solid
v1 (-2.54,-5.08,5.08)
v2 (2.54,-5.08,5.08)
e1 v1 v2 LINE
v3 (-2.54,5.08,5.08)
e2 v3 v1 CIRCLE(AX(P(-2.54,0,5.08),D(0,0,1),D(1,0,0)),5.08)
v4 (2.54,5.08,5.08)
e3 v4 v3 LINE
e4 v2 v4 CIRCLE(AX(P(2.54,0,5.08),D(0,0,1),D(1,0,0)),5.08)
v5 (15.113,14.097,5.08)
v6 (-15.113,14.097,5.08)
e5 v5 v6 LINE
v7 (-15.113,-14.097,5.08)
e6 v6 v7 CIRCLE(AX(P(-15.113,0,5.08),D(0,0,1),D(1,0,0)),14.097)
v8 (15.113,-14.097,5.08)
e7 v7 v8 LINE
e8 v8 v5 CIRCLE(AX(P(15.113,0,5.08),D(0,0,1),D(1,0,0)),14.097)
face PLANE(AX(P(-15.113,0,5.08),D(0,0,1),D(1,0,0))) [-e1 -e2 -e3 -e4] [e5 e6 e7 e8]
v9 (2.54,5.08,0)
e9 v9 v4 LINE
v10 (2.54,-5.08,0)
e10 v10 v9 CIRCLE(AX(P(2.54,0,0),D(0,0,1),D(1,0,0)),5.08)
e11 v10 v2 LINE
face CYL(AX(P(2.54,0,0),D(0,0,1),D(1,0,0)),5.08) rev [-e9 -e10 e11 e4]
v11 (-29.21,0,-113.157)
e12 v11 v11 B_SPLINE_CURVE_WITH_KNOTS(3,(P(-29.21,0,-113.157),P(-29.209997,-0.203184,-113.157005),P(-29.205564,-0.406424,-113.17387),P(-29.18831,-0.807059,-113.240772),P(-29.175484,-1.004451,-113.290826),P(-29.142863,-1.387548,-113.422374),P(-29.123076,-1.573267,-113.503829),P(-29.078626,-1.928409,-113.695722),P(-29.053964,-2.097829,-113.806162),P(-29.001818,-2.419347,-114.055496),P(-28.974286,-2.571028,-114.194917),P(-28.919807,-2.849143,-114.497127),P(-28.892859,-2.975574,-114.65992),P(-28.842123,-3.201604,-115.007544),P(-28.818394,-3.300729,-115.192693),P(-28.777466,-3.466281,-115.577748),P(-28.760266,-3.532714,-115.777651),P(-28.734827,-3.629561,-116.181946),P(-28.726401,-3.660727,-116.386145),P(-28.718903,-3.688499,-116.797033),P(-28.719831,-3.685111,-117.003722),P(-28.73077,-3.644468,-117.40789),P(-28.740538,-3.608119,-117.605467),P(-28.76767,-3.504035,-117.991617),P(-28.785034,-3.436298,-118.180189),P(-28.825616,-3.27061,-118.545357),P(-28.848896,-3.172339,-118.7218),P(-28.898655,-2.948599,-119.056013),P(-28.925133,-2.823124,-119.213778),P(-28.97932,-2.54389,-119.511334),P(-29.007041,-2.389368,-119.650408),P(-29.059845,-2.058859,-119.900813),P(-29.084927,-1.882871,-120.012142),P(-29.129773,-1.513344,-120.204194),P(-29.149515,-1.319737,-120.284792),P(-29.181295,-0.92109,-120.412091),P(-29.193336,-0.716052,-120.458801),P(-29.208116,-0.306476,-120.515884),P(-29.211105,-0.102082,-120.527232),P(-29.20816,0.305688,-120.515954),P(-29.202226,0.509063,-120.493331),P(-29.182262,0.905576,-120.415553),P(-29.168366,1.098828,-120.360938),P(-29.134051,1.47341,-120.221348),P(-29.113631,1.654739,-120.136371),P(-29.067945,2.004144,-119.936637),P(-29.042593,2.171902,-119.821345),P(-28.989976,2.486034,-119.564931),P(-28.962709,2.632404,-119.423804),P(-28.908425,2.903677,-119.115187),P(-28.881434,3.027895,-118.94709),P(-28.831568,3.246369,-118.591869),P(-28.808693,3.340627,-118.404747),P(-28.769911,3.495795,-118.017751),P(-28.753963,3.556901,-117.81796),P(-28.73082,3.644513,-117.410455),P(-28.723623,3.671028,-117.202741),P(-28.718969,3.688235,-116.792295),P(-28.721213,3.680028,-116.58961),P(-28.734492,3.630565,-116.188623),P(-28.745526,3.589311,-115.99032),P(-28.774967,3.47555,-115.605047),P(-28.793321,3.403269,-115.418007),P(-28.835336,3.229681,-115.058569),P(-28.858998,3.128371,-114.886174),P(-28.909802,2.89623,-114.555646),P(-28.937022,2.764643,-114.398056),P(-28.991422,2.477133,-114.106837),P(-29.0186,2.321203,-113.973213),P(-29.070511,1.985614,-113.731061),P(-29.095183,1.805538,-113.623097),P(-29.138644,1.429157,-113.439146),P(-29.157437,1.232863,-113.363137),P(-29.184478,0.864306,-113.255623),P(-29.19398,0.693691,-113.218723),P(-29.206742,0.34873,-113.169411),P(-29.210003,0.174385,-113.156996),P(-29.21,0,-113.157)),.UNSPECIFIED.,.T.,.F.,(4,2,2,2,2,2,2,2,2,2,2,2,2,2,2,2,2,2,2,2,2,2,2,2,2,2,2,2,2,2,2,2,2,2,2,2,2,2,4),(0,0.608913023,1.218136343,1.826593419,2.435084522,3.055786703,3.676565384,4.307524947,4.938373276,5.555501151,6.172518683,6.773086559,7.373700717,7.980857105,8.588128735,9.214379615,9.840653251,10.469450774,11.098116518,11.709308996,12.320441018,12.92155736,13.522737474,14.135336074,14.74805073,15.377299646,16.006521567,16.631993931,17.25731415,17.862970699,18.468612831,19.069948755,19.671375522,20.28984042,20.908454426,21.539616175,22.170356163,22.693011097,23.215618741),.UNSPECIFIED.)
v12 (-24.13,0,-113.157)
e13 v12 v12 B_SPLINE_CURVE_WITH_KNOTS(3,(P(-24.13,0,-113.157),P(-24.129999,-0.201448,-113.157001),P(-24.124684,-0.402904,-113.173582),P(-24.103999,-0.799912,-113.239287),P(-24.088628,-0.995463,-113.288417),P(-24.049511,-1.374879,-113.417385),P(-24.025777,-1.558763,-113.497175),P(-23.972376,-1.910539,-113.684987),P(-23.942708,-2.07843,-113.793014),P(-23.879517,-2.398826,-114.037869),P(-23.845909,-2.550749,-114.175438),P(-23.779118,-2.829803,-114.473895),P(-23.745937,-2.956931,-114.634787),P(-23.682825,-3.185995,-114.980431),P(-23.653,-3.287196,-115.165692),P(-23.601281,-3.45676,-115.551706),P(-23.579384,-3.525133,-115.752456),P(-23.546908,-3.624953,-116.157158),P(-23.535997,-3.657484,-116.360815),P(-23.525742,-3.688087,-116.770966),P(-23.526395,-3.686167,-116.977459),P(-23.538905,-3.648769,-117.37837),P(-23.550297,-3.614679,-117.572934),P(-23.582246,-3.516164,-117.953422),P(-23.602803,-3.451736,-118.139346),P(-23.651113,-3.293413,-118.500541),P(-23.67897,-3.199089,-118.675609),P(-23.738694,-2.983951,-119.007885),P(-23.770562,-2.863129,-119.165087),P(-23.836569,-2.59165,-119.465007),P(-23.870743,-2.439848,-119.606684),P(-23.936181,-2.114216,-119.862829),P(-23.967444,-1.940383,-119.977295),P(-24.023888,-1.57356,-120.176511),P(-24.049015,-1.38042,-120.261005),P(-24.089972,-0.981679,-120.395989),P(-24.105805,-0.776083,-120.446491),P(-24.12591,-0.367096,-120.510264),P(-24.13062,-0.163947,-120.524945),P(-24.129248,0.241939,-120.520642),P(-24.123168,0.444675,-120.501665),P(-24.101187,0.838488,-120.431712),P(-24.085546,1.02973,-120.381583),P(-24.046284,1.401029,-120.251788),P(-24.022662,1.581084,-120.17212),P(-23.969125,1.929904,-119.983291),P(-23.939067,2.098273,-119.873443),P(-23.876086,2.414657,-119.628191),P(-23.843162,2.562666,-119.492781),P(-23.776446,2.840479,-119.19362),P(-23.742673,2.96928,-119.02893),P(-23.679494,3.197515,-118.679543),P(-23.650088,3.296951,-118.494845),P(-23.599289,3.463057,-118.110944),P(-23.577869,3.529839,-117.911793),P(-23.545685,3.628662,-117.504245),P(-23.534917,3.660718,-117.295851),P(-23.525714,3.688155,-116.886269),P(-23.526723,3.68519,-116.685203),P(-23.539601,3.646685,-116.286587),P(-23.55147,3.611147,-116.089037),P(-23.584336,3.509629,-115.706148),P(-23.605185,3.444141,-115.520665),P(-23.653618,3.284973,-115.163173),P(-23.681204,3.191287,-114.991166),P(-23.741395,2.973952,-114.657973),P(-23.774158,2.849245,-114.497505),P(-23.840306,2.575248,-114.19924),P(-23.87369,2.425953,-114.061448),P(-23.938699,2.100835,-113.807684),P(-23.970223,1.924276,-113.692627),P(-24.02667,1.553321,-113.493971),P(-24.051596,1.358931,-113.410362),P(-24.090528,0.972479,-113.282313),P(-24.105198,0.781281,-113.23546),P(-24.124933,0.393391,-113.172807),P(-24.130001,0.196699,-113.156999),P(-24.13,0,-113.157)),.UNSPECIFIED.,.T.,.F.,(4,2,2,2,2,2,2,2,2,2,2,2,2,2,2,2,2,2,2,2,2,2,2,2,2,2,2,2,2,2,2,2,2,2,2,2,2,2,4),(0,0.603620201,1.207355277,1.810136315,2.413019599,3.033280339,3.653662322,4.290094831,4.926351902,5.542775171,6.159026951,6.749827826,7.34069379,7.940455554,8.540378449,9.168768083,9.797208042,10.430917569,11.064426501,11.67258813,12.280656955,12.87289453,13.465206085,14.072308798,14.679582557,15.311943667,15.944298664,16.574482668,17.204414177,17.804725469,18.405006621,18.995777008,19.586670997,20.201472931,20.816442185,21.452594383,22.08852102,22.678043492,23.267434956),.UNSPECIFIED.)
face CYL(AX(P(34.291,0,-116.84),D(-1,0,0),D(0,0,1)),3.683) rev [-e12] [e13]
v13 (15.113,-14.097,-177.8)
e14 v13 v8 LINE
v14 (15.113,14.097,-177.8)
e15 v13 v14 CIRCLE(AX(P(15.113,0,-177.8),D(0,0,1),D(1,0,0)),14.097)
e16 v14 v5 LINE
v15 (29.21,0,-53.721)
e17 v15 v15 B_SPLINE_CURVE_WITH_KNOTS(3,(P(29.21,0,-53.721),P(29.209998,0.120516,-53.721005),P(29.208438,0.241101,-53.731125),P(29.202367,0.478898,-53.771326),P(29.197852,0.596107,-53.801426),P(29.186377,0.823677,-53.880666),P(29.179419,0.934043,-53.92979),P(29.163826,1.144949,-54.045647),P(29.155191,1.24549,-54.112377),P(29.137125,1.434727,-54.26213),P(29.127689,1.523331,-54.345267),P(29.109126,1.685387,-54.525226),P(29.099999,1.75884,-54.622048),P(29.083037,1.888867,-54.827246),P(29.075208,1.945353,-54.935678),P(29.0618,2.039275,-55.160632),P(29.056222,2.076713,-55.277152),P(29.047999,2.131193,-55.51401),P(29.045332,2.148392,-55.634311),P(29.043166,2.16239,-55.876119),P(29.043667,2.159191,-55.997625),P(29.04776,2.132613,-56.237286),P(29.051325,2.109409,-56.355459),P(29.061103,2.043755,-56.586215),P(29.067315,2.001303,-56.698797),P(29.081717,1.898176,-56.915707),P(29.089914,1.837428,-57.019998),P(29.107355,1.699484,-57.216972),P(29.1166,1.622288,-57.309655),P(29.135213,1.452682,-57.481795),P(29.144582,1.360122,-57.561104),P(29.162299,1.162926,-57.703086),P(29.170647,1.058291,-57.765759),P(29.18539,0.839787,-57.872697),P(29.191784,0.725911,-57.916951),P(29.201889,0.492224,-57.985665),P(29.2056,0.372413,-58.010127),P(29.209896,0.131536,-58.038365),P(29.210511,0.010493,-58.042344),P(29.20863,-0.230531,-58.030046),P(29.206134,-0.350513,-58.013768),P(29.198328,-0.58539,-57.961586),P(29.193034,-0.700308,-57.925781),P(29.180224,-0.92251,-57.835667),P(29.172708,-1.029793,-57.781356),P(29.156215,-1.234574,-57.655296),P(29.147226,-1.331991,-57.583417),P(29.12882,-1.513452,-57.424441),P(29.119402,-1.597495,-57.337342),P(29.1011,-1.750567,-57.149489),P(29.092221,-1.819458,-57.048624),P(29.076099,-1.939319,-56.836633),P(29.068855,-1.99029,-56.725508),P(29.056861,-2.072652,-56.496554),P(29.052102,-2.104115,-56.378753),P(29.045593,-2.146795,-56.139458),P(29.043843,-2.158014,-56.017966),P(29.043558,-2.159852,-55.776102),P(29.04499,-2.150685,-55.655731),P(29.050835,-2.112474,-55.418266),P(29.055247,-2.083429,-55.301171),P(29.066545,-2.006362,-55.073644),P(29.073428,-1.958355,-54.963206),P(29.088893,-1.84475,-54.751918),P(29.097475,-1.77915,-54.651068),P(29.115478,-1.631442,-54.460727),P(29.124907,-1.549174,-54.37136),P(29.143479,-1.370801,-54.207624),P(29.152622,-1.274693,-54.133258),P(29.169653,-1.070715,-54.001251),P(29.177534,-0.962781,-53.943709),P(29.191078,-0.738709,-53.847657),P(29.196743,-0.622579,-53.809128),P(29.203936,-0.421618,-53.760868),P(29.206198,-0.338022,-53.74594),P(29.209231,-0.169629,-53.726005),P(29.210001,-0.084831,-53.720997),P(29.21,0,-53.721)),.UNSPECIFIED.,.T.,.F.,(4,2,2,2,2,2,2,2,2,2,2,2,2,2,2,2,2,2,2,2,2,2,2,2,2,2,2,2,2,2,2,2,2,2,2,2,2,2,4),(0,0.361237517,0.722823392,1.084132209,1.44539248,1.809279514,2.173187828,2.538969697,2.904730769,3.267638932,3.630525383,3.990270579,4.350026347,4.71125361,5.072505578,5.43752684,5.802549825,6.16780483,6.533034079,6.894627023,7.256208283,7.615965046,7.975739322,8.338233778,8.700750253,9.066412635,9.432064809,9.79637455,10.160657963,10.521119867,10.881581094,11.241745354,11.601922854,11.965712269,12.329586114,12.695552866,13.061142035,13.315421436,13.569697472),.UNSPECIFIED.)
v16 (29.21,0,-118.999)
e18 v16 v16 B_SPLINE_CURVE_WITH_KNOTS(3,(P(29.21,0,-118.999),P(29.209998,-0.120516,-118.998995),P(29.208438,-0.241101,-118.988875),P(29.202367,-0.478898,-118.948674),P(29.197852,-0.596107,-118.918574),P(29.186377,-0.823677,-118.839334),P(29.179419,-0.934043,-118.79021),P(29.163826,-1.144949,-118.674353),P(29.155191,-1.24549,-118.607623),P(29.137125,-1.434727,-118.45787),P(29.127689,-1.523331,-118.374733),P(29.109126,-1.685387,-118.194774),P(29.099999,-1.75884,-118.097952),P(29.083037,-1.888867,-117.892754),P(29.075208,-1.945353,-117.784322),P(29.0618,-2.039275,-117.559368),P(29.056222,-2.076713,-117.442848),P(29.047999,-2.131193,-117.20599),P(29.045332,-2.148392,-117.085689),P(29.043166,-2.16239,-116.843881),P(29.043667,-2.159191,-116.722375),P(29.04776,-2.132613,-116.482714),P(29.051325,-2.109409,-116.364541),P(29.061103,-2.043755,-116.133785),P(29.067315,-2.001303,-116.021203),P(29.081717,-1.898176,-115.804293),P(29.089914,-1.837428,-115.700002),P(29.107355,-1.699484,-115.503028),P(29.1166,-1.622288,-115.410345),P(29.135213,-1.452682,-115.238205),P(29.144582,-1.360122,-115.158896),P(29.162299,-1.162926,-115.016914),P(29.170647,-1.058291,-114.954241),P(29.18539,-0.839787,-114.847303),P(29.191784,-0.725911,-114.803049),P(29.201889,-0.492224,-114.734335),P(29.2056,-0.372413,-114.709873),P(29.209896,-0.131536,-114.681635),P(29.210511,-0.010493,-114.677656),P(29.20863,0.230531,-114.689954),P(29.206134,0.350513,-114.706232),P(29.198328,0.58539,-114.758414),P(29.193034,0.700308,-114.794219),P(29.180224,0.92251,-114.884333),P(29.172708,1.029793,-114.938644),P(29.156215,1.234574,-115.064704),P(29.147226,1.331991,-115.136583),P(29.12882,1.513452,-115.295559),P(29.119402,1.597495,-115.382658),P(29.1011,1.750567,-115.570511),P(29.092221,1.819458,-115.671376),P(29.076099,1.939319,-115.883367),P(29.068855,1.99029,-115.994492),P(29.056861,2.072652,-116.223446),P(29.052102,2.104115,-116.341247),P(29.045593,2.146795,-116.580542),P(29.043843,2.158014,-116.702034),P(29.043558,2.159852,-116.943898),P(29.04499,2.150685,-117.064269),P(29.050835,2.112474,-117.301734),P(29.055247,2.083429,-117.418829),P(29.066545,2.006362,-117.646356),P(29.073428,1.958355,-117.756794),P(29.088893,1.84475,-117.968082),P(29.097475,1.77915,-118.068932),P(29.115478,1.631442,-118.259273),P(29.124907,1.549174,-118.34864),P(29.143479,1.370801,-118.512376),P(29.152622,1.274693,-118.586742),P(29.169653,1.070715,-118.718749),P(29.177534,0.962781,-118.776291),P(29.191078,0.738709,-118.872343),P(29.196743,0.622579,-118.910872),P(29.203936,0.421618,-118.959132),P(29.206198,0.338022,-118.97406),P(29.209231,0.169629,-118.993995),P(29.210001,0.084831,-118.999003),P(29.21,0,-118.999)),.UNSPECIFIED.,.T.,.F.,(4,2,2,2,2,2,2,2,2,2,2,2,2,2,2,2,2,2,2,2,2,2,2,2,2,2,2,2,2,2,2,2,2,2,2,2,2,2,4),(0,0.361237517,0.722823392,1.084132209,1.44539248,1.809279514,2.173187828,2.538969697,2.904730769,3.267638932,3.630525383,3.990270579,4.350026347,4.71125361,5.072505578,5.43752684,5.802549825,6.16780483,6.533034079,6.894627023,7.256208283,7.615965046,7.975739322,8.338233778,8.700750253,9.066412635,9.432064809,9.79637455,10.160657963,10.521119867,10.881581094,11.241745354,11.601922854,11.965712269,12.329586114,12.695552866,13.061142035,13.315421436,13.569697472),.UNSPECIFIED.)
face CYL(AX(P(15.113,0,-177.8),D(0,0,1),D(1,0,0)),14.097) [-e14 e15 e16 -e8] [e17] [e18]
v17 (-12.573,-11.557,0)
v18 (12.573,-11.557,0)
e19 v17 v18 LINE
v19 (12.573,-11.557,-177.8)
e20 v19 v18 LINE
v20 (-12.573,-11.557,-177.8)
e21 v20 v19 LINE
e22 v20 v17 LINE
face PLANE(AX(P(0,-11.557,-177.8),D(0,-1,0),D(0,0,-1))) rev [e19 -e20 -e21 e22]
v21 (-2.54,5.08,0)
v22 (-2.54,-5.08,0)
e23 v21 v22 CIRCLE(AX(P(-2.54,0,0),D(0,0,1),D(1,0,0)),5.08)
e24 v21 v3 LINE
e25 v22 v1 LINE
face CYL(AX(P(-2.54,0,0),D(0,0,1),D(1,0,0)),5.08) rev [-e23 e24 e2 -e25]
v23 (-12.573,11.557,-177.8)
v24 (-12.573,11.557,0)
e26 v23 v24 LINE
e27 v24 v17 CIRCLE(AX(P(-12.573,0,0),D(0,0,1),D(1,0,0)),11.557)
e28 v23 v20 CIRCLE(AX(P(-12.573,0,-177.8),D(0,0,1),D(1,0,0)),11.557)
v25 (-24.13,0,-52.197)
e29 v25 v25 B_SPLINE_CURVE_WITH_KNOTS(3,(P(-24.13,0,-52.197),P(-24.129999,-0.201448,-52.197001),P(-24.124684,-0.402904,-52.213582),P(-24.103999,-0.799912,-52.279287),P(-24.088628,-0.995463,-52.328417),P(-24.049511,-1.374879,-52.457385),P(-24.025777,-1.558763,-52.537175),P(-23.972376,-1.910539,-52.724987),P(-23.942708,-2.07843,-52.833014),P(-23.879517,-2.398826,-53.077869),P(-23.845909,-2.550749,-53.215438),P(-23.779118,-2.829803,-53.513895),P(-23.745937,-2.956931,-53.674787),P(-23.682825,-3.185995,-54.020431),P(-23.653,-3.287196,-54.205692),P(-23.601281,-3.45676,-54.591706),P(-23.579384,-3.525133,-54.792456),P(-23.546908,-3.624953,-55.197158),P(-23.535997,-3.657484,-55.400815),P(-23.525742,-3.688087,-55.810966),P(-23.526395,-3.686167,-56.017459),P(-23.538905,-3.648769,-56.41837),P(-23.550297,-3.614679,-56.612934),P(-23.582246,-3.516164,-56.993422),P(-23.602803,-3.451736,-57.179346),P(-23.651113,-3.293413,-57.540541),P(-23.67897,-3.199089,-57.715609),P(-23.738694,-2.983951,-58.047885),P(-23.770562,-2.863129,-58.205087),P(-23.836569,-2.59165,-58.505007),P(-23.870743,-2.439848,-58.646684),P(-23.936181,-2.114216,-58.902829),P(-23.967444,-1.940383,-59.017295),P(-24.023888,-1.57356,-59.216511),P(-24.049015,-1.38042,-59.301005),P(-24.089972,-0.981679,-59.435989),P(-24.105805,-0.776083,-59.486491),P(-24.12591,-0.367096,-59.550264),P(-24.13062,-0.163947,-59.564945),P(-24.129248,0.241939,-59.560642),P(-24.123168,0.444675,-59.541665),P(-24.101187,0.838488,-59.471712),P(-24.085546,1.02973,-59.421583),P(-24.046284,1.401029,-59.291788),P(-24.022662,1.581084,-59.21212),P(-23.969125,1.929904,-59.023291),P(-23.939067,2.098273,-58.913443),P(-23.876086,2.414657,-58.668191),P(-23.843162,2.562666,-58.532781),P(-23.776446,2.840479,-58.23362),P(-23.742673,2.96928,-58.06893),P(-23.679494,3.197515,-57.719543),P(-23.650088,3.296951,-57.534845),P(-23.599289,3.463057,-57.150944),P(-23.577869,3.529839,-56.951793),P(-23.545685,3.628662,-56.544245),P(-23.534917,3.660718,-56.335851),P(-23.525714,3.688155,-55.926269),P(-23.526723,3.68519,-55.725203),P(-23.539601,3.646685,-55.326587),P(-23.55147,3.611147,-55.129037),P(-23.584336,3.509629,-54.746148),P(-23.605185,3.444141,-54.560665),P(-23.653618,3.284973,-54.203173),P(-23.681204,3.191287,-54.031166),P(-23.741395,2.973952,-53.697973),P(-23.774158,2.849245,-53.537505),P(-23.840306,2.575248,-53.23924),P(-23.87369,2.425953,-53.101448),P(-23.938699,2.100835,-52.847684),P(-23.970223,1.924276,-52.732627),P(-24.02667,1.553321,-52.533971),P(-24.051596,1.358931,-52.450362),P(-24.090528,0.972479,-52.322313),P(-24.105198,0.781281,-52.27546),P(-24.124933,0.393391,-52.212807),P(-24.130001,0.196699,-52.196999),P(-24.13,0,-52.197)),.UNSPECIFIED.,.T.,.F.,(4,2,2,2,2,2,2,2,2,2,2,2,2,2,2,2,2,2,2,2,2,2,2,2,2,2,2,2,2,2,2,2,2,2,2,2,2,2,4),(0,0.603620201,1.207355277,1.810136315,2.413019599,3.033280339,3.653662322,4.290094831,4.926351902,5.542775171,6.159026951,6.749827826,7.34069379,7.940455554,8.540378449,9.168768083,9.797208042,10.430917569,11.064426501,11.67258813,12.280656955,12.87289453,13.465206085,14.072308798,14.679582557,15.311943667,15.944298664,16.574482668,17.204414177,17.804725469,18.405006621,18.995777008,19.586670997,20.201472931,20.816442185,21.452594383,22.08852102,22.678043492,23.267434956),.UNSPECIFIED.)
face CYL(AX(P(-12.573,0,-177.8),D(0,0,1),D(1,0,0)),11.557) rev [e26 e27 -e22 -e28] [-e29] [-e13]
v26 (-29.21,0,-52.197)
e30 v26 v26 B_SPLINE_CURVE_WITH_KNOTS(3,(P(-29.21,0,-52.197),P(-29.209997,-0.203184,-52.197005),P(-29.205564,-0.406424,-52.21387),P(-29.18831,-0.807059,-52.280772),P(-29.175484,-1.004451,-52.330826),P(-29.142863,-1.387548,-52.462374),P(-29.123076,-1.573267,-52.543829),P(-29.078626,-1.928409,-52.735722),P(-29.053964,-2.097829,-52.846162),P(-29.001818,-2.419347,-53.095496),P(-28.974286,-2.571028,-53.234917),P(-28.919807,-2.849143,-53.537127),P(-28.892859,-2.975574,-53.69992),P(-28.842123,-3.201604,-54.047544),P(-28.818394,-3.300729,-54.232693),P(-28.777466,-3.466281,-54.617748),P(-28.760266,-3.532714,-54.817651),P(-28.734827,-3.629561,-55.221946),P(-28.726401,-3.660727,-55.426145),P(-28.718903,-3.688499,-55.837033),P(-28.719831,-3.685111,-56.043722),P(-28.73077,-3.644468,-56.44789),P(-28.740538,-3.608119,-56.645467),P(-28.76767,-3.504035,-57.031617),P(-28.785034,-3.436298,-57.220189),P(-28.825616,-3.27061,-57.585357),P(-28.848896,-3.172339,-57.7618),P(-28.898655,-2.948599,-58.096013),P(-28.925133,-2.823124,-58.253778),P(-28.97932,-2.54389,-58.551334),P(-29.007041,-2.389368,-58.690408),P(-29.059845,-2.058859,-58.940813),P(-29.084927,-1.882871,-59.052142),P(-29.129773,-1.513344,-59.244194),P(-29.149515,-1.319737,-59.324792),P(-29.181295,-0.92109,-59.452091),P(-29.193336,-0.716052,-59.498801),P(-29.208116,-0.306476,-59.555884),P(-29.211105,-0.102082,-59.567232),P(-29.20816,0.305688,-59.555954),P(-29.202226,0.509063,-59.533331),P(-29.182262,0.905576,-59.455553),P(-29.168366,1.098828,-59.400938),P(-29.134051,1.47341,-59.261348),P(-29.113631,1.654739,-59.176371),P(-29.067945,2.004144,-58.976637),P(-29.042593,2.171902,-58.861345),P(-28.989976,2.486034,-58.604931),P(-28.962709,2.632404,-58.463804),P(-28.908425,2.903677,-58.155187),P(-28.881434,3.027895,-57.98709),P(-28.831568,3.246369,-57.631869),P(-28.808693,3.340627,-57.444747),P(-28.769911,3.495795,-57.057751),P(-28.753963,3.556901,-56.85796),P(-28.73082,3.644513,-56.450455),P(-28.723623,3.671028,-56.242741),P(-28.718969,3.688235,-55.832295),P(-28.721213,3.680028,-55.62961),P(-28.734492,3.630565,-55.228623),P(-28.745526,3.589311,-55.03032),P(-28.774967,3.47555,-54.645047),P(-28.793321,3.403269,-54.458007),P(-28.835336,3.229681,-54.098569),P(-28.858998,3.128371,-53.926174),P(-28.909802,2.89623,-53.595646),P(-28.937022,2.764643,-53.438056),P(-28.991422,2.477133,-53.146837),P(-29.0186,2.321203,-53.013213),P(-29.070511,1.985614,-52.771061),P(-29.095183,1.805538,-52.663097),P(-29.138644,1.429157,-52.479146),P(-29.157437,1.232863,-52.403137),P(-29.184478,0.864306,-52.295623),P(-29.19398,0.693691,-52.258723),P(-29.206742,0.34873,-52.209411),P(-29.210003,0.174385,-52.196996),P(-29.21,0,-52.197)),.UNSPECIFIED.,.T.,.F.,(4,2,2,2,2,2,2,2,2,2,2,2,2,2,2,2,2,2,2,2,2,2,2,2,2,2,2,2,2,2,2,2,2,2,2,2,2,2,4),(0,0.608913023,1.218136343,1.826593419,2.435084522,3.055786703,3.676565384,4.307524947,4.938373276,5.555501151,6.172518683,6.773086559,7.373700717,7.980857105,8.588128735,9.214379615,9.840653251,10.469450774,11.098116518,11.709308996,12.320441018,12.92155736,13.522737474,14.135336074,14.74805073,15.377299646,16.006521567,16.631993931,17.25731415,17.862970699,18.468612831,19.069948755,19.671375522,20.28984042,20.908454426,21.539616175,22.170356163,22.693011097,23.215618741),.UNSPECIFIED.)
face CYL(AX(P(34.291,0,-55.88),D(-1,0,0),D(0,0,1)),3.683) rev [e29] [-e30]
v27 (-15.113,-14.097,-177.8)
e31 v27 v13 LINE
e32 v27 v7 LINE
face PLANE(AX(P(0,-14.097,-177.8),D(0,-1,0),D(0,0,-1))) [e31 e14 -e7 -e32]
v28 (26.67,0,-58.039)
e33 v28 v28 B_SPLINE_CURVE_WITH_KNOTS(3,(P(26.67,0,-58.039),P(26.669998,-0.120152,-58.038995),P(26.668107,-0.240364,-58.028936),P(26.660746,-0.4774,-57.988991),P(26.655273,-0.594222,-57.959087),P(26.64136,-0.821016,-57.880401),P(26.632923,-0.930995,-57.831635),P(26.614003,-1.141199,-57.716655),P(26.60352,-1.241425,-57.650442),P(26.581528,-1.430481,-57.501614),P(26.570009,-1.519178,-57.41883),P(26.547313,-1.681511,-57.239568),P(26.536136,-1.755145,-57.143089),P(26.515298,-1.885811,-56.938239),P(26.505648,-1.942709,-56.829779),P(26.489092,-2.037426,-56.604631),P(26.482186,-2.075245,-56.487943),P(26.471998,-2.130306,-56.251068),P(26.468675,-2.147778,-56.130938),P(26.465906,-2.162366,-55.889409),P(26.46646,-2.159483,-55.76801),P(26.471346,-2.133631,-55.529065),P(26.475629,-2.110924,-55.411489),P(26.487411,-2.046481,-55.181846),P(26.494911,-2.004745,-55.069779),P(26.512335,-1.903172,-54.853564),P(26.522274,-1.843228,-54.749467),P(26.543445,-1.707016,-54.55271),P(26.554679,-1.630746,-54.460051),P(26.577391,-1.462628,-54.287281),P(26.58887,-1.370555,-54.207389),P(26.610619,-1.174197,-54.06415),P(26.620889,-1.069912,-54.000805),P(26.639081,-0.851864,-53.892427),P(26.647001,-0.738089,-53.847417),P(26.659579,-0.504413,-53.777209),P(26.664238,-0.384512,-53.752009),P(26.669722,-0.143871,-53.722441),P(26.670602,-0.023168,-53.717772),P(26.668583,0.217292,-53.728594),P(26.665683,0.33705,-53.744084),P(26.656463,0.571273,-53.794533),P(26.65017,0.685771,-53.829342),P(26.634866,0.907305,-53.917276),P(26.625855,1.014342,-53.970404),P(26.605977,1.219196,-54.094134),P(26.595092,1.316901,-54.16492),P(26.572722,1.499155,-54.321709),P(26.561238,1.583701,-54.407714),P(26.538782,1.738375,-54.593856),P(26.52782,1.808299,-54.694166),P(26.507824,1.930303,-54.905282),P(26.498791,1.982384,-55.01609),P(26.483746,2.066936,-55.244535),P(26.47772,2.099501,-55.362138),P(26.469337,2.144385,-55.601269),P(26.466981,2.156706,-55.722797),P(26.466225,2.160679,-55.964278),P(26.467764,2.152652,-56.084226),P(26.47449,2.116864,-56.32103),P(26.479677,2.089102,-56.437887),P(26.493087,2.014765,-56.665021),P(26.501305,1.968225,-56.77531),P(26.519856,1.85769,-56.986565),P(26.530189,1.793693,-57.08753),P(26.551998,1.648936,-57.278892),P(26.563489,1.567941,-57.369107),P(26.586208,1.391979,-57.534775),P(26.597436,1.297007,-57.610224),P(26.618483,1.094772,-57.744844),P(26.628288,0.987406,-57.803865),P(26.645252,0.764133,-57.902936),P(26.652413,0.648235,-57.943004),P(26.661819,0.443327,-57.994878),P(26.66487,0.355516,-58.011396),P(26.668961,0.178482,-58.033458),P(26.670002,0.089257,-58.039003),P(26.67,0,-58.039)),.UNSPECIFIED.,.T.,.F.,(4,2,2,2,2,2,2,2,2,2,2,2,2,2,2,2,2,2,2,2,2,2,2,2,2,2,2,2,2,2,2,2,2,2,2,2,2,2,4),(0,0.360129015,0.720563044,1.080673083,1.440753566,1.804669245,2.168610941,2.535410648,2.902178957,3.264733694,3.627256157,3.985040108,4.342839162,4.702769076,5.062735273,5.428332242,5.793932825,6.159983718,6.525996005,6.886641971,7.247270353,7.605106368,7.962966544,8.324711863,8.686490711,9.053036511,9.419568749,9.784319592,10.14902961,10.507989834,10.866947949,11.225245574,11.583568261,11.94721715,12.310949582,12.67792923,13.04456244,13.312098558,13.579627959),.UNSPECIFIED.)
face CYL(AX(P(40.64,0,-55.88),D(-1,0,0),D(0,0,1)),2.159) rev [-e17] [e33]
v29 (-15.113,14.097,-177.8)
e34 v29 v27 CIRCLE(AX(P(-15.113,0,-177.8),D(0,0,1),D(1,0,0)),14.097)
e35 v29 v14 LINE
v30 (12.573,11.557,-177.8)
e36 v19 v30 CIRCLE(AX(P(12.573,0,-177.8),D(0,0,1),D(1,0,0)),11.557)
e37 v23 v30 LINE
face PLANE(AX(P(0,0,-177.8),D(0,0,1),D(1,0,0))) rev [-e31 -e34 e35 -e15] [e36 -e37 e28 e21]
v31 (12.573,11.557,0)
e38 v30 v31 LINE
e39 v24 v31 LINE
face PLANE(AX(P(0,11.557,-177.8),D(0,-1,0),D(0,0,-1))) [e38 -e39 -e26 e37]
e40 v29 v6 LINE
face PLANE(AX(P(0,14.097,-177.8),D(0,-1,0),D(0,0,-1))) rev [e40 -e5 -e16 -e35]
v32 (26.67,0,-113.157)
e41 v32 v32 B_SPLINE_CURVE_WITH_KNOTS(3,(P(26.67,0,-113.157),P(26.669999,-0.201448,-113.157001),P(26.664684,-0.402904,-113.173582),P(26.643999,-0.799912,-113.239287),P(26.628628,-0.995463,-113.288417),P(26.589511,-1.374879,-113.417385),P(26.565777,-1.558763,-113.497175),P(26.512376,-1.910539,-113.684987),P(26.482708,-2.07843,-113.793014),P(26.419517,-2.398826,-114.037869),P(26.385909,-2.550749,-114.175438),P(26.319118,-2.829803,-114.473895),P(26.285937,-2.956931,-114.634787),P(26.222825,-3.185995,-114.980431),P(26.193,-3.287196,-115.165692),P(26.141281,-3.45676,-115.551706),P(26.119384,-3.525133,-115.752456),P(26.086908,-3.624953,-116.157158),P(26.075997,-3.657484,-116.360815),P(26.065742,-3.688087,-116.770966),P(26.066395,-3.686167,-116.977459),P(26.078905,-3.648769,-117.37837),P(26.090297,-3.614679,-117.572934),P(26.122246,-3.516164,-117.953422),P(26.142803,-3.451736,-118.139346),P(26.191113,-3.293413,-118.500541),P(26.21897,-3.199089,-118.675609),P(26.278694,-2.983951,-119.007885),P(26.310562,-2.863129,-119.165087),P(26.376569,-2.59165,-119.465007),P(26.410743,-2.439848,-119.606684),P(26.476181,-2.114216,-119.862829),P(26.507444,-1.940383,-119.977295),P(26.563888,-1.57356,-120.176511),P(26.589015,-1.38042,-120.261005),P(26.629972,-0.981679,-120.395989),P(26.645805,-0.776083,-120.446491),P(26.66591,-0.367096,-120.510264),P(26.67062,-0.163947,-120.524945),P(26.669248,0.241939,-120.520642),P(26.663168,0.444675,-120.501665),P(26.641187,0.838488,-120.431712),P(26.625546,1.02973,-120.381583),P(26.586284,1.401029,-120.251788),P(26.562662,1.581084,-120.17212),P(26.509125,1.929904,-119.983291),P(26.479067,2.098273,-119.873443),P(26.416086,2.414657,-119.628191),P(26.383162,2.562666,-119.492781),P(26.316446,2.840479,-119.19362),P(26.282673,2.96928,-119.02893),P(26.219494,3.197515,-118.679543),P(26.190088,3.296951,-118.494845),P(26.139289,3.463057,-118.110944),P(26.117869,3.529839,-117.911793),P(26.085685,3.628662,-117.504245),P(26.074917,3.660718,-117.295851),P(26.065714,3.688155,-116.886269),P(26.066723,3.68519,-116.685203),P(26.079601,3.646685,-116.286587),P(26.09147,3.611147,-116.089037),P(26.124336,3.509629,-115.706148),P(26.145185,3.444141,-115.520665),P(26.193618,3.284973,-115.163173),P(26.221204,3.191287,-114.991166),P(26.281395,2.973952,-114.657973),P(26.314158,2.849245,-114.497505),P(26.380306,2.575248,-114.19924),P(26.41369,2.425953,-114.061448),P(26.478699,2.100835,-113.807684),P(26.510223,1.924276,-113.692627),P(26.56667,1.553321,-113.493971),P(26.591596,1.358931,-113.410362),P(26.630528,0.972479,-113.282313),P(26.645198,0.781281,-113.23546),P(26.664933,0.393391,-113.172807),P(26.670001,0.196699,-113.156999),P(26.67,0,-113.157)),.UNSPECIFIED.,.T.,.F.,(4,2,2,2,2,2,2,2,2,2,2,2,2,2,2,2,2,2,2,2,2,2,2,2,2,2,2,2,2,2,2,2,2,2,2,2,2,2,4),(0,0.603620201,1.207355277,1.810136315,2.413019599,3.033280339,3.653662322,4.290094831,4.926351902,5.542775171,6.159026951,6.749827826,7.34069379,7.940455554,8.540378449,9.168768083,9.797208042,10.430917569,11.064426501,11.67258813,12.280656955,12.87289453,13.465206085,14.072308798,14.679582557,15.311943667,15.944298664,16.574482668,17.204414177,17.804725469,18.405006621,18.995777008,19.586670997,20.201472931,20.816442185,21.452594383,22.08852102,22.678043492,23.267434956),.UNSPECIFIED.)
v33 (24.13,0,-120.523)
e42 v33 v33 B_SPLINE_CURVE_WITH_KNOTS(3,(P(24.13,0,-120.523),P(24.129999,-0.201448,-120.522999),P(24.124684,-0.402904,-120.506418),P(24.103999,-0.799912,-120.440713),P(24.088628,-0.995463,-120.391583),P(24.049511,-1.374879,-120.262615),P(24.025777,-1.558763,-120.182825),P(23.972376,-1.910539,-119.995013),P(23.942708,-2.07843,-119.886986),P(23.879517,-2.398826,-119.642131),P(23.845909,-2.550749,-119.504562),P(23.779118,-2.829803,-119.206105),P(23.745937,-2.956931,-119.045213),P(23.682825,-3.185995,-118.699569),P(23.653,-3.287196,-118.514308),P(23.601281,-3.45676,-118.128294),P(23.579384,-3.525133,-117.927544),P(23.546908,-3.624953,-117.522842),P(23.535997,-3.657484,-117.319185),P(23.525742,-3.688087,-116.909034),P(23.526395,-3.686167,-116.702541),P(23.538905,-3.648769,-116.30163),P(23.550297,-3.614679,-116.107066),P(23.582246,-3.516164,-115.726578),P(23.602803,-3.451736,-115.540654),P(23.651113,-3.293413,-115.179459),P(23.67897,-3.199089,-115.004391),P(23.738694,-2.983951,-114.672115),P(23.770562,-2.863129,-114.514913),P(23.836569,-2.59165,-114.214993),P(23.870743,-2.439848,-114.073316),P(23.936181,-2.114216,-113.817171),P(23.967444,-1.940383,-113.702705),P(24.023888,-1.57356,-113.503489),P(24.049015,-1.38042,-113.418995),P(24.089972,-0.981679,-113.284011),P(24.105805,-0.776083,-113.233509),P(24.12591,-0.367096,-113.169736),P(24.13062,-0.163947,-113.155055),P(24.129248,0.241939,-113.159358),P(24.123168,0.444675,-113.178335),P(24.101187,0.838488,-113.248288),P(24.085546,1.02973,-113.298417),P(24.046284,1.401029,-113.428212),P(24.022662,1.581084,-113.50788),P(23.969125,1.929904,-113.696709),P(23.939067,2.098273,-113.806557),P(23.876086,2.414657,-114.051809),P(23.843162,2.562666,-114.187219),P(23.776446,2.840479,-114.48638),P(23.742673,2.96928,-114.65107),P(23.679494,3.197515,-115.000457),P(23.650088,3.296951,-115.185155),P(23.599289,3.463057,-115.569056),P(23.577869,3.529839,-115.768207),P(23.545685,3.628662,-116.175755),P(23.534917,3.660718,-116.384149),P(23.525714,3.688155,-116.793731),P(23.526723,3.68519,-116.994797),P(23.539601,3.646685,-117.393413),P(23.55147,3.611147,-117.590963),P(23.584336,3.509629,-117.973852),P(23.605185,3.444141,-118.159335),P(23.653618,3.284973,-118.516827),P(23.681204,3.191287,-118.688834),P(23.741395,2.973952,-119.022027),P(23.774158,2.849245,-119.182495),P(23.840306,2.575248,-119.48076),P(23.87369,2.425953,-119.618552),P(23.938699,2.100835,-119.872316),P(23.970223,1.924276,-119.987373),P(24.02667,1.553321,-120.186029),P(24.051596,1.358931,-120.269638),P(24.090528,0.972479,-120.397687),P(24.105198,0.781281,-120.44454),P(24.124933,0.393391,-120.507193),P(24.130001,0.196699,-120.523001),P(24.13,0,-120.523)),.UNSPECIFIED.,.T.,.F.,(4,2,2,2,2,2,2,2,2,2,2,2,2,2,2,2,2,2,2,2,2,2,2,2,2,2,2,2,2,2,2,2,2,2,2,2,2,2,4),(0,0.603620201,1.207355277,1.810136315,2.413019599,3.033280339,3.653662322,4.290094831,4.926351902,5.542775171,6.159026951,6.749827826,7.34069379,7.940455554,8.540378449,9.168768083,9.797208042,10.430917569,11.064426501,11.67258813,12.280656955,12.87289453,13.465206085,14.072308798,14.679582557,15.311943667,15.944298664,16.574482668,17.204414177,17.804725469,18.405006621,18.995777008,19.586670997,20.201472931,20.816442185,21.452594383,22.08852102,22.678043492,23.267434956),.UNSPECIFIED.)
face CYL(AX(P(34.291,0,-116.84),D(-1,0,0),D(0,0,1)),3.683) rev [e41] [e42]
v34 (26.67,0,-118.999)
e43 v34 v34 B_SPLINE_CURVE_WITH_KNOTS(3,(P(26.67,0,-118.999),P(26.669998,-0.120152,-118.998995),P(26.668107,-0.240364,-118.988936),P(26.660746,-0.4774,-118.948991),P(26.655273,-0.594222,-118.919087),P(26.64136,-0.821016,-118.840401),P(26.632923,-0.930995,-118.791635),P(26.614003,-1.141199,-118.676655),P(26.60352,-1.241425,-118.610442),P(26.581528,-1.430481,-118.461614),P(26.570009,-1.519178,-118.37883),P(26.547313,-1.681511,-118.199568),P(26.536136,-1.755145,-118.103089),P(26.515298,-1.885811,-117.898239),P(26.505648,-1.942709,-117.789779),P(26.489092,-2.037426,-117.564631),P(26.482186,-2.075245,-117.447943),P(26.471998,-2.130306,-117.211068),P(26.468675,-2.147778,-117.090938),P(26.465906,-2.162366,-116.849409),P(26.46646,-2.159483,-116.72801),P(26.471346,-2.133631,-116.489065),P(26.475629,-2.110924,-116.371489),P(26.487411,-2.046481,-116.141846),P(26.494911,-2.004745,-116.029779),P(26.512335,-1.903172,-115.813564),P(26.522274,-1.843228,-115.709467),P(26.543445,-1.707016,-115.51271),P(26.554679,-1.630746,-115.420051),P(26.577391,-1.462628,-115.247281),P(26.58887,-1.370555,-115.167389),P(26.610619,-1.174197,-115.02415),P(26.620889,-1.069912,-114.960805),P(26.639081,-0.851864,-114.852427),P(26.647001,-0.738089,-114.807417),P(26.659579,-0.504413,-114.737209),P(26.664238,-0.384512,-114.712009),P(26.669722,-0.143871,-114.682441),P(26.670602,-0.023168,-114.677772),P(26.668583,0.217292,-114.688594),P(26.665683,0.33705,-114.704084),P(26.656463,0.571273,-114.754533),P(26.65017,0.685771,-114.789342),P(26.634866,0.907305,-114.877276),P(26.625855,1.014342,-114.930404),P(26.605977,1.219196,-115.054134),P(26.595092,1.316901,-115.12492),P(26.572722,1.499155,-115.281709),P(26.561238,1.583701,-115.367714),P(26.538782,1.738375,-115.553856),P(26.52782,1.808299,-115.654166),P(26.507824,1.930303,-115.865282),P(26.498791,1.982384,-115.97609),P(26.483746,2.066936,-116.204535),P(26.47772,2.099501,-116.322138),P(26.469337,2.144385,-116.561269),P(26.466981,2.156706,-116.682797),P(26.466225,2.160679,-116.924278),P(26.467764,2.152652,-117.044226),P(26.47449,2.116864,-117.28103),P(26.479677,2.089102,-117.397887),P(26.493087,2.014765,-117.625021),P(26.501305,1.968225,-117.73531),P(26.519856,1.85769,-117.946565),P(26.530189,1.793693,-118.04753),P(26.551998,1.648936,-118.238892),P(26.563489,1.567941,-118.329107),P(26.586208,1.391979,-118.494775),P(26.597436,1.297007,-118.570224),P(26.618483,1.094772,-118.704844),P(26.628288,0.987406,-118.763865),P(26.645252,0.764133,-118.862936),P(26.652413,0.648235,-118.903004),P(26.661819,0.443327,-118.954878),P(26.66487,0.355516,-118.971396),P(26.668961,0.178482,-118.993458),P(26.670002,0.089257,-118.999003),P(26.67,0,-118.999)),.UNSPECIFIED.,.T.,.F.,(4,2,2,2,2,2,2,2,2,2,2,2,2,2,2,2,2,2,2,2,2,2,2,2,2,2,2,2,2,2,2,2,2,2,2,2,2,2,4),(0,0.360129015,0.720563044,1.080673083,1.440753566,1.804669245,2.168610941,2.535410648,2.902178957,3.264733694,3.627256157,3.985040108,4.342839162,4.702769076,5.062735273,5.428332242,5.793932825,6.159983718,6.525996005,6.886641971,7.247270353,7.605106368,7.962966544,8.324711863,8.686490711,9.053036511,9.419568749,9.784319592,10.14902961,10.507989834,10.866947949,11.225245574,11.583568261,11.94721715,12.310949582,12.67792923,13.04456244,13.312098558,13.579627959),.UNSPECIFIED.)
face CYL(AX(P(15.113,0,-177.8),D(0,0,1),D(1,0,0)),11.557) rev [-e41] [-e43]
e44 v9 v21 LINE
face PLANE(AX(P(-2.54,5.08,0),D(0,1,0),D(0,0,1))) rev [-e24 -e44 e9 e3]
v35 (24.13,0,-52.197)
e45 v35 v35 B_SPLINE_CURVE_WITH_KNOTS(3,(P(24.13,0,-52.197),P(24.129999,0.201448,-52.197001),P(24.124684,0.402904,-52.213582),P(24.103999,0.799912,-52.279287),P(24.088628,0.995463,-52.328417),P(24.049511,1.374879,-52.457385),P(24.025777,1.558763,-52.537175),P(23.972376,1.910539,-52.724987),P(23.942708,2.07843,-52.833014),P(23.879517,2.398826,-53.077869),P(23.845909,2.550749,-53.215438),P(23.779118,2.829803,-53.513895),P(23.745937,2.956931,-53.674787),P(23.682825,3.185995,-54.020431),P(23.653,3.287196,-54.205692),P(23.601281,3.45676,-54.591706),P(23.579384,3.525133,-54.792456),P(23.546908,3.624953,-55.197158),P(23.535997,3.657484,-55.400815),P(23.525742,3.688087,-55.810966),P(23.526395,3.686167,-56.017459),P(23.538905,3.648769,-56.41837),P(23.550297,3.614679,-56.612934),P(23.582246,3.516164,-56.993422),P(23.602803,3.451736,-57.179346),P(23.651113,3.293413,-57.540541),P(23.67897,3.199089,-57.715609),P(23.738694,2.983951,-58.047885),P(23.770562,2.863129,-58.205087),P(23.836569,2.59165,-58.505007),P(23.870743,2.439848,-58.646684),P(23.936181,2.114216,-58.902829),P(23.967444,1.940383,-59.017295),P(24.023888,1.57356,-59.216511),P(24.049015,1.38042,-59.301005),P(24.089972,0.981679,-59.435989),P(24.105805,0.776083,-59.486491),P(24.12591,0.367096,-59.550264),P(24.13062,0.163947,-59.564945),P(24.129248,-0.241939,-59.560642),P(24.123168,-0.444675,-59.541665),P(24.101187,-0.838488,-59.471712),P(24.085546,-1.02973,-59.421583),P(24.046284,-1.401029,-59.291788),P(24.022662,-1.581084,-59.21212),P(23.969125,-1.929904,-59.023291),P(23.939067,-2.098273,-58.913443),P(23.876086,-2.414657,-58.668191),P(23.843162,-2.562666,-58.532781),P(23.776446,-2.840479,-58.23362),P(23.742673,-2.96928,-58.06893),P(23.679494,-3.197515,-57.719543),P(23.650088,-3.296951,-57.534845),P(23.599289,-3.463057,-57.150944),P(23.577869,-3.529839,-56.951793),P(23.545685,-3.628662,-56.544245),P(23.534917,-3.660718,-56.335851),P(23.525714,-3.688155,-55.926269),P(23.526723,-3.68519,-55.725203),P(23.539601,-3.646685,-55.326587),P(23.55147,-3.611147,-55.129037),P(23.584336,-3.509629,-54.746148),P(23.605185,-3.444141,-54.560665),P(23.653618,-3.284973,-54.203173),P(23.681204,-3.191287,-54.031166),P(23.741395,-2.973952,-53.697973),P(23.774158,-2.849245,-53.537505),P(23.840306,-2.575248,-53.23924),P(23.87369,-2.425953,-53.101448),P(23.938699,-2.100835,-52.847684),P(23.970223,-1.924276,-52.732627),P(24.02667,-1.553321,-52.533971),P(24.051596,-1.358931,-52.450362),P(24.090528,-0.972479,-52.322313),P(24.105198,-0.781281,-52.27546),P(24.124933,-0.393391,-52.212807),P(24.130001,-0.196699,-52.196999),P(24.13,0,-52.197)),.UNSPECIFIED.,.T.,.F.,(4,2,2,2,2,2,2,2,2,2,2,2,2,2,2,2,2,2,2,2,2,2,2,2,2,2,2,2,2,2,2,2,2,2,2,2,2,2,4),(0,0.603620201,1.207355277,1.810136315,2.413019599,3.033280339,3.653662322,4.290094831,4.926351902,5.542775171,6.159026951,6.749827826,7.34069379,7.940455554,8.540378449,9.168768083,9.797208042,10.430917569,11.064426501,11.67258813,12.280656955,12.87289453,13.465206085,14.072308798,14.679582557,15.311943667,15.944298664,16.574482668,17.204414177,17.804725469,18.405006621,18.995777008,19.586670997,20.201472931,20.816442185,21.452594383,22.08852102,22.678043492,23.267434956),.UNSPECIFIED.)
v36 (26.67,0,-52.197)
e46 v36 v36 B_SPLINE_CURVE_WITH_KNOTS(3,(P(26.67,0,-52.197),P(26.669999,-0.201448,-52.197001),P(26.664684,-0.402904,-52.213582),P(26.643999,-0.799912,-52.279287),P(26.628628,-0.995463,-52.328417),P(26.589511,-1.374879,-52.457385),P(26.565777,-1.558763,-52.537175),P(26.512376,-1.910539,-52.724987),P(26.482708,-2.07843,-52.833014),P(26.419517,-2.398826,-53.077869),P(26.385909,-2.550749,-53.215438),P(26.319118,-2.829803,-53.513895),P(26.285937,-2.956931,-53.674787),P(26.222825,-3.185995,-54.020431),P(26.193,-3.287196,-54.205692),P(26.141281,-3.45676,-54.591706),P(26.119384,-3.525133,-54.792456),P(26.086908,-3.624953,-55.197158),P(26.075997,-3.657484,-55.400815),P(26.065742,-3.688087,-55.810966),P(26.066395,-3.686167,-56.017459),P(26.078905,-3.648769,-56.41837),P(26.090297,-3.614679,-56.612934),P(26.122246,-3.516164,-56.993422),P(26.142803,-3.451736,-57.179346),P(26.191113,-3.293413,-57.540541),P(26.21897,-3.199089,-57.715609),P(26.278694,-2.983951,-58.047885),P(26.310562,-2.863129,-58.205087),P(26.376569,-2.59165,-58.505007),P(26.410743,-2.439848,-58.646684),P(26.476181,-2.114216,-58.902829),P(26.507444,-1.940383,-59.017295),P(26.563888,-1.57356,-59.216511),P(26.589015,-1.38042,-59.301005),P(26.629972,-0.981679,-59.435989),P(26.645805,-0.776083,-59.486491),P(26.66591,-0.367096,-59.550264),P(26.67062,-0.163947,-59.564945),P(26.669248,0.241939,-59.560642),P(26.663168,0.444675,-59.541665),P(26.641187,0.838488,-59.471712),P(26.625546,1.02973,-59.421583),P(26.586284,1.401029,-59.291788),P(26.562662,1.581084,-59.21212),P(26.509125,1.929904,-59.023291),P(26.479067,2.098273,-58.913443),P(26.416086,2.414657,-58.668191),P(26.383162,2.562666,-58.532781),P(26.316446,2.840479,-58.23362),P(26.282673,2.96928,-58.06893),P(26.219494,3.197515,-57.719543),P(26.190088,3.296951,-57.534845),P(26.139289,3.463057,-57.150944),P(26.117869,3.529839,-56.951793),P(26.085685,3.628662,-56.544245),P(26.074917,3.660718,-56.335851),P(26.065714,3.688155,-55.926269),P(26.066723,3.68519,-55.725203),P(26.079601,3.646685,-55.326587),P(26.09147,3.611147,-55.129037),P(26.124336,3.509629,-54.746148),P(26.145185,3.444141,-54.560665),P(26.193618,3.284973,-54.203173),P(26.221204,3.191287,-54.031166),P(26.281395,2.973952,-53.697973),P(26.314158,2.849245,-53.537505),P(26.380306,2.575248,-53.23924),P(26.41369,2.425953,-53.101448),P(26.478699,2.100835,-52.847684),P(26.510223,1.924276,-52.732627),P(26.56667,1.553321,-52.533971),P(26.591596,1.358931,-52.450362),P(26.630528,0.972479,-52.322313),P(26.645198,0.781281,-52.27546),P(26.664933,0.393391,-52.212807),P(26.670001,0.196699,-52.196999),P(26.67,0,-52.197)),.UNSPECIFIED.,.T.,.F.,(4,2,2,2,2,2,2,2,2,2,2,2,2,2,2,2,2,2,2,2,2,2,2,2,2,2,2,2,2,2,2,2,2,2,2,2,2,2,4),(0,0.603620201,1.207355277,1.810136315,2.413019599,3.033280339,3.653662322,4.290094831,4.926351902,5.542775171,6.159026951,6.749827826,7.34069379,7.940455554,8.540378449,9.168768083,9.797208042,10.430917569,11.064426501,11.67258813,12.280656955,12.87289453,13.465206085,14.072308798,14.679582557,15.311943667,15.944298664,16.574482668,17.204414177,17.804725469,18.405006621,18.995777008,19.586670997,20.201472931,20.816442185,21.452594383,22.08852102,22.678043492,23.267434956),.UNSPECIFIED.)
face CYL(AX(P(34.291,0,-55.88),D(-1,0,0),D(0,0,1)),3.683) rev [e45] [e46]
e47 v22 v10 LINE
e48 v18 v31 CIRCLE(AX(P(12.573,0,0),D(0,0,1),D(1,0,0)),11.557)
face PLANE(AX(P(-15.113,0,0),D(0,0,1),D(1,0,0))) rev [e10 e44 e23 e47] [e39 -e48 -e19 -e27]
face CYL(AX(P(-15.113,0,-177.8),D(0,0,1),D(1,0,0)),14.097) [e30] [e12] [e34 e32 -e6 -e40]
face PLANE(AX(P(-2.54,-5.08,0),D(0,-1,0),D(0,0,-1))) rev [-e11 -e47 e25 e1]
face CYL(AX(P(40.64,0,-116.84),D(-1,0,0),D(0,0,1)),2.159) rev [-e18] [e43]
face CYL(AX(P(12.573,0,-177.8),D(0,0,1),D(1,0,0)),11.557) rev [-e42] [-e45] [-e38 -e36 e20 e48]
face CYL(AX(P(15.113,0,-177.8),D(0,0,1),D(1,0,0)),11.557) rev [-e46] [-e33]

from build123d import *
from build123d.topology import SkipClean

# Parameters (mm, degrees)
BOSS_EXTRUDE1_DEPTH     = 177.8
BOSS_EXTRUDE2_START     = 5.08
BOSS_EXTRUDE2_DEPTH     = 5.08
CUT_EXTRUDE5_DEPTH      = 5.08
CUT_EXTRUDE6_START      = -30
CUT_EXTRUDE6_OUTLINE_R  = 3.683
CUT_EXTRUDE6_DEPTH      = 56.067449815
CUT_EXTRUDE6_START_2    = -120.5230001
CUT_EXTRUDE6_2_DEPTH    = 7.3660001
CUT_EXTRUDE6_START_3    = -59.563
CUT_EXTRUDE6_3_DEPTH    = 7.366
CUT_EXTRUDE6_START_4    = 26.067441172
CUT_EXTRUDE6_4_DEPTH    = 1.932558828
CUT_EXTRUDE7_DEPTH      = 40.64
CUT_EXTRUDE7_DEPTH_BACK = 40.64
SKETCH9_R               = 2.159


with BuildPart() as part:
    # Sketch1 → Boss-Extrude1 (new body)
    with BuildSketch(Plane.XY):
        with BuildLine():
            ThreePointArc((-24.13, 0), (-20.74503307, 8.17203307), (-12.573, 11.557))
            Line((-12.573, 11.557), (12.573, 11.557))
            ThreePointArc((12.573, 11.557), (20.74503307, 8.17203307), (24.13, 0))
            Line((24.13, 0), (29.21, 0))
            ThreePointArc((29.21, 0), (25.081084294, 9.968084294), (15.113, 14.097))
            Line((15.113, 14.097), (-15.113, 14.097))
            ThreePointArc((-15.113, 14.097), (-25.081084294, 9.968084294), (-29.21, 0))
            Line((-29.21, 0), (-24.13, 0))
        make_face()
        with BuildLine():
            ThreePointArc((-12.573, -11.557), (-20.74503307, -8.17203307), (-24.13, 0))
            Line((-24.13, 0), (-29.21, 0))
            ThreePointArc((-29.21, 0), (-25.081084294, -9.968084294), (-15.113, -14.097))
            Line((-15.113, -14.097), (15.113, -14.097))
            ThreePointArc((15.113, -14.097), (25.081084294, -9.968084294), (29.21, 0))
            Line((29.21, 0), (24.13, 0))
            ThreePointArc((24.13, 0), (20.74503307, -8.17203307), (12.573, -11.557))
            Line((12.573, -11.557), (-12.573, -11.557))
        make_face()
    extrude(amount=-BOSS_EXTRUDE1_DEPTH)

    # Sketch3 → Boss-Extrude2 (add)
    with BuildSketch(Plane.XY.offset(BOSS_EXTRUDE2_START)):
        with BuildLine():
            Line((-15.113, 14.097), (15.113, 14.097))
            ThreePointArc((15.113, 14.097), (29.21, 0), (15.113, -14.097))
            Line((15.113, -14.097), (-15.113, -14.097))
            ThreePointArc((-15.113, -14.097), (-29.21, 0), (-15.113, 14.097))
        make_face()
    extrude(amount=-BOSS_EXTRUDE2_DEPTH)

    # Sketch7 → Cut-Extrude5 (cut)
    with BuildSketch(Plane.XY.offset(5.08)):
        with BuildLine():
            Line((-2.54, 5.08), (2.54, 5.08))
            ThreePointArc((2.54, 5.08), (7.62, 0), (2.54, -5.08))
            Line((2.54, -5.08), (-2.54, -5.08))
            ThreePointArc((-2.54, -5.08), (-7.62, 0), (-2.54, 5.08))
        make_face()
    extrude(amount=-CUT_EXTRUDE5_DEPTH, mode=Mode.SUBTRACT)

    # Cut-Extrude6: read off the stored shape, not the designer's step
    # Cut-Extrude6 outline → Cut-Extrude6 (cut)
    with SkipClean():  # the faces are left unmerged after this step: merging them gives an invalid solid
        with BuildSketch(Plane(origin=(0, 0, 0), x_dir=(0, 0, -1), z_dir=(1, 0, 0)).offset(CUT_EXTRUDE6_START)):
            with Locations((55.88, 0)):
                Circle(CUT_EXTRUDE6_OUTLINE_R)
            with Locations((116.84, 0)):
                Circle(CUT_EXTRUDE6_OUTLINE_R)
        extrude(amount=CUT_EXTRUDE6_DEPTH, mode=Mode.SUBTRACT)

    # Cut-Extrude6 2 outline → Cut-Extrude6 2 (cut)
    with SkipClean():  # the faces are left unmerged after this step: merging them gives an invalid solid
        with BuildSketch(Plane.XY.offset(CUT_EXTRUDE6_START_2)):
            with BuildLine():
                Line((26.067441172, 3.682997094), (26.067441173, -3.682997094))
                ThreePointArc((26.067441173, -3.682997094), (26.67, 0), (26.067441172, 3.682997094))
            make_face()
        extrude(amount=CUT_EXTRUDE6_2_DEPTH, mode=Mode.SUBTRACT)

    # Cut-Extrude6 3 outline → Cut-Extrude6 3 (cut)
    with SkipClean():  # the faces are left unmerged after this step: merging them gives an invalid solid
        with BuildSketch(Plane.XY.offset(CUT_EXTRUDE6_START_3)):
            with BuildLine():
                Line((26.067441172, 3.682997094), (26.067441173, -3.682997094))
                ThreePointArc((26.067441173, -3.682997094), (26.67, 0), (26.067441172, 3.682997094))
            make_face()
        extrude(amount=CUT_EXTRUDE6_3_DEPTH, mode=Mode.SUBTRACT)

    # Cut-Extrude6 4 outline → Cut-Extrude6 4 (add)
    with SkipClean():  # the faces are left unmerged after this step: merging them gives an invalid solid
        with BuildSketch(Plane.YZ.offset(CUT_EXTRUDE6_START_4)):
            with BuildLine():
                ThreePointArc((0, -52.197), (3.683, -55.88), (0, -59.563))
                Line((0, -59.563), (5, -59.563))
                Line((5, -59.563), (5, -52.197))
                Line((5, -52.197), (0, -52.197))
            make_face()
            with BuildLine():
                ThreePointArc((0, -59.563), (-3.683, -55.88), (0, -52.197))
                Line((0, -52.197), (-5, -52.197))
                Line((-5, -52.197), (-5, -59.563))
                Line((-5, -59.563), (0, -59.563))
            make_face()
            with BuildLine():
                Line((5, -120.5230001), (5, -113.157))
                Line((5, -113.157), (6.9e-08, -113.157))
                ThreePointArc((6.9e-08, -113.157), (3.683, -116.840000034), (0, -120.523))
                Line((0, -120.523), (5, -120.5230001))
            make_face()
            with BuildLine():
                Line((6.9e-08, -113.157), (-5, -113.157))
                Line((-5, -113.157), (-5, -120.5230001))
                Line((-5, -120.5230001), (0, -120.523))
                ThreePointArc((0, -120.523), (-3.683, -116.839999966), (6.9e-08, -113.157))
            make_face()
        extrude(amount=CUT_EXTRUDE6_4_DEPTH)

    # Sketch9 → Cut-Extrude7 (cut, two sides: drawn at the far end of the back side and taken through both)
    with SkipClean():  # the faces are left unmerged after this step: merging them gives an invalid solid
        with BuildSketch(Plane(origin=(0, 0, 0), x_dir=(0, 0, -1), z_dir=(1, 0, 0)).offset(-CUT_EXTRUDE7_DEPTH_BACK)):
            with Locations(Location((55.88, 0, 0), (0, 0, 180))):
                Circle(SKETCH9_R)
            with Locations((116.84, 0)):
                Circle(SKETCH9_R)
        extrude(amount=CUT_EXTRUDE7_DEPTH + CUT_EXTRUDE7_DEPTH_BACK, mode=Mode.SUBTRACT)


solid = part.part
